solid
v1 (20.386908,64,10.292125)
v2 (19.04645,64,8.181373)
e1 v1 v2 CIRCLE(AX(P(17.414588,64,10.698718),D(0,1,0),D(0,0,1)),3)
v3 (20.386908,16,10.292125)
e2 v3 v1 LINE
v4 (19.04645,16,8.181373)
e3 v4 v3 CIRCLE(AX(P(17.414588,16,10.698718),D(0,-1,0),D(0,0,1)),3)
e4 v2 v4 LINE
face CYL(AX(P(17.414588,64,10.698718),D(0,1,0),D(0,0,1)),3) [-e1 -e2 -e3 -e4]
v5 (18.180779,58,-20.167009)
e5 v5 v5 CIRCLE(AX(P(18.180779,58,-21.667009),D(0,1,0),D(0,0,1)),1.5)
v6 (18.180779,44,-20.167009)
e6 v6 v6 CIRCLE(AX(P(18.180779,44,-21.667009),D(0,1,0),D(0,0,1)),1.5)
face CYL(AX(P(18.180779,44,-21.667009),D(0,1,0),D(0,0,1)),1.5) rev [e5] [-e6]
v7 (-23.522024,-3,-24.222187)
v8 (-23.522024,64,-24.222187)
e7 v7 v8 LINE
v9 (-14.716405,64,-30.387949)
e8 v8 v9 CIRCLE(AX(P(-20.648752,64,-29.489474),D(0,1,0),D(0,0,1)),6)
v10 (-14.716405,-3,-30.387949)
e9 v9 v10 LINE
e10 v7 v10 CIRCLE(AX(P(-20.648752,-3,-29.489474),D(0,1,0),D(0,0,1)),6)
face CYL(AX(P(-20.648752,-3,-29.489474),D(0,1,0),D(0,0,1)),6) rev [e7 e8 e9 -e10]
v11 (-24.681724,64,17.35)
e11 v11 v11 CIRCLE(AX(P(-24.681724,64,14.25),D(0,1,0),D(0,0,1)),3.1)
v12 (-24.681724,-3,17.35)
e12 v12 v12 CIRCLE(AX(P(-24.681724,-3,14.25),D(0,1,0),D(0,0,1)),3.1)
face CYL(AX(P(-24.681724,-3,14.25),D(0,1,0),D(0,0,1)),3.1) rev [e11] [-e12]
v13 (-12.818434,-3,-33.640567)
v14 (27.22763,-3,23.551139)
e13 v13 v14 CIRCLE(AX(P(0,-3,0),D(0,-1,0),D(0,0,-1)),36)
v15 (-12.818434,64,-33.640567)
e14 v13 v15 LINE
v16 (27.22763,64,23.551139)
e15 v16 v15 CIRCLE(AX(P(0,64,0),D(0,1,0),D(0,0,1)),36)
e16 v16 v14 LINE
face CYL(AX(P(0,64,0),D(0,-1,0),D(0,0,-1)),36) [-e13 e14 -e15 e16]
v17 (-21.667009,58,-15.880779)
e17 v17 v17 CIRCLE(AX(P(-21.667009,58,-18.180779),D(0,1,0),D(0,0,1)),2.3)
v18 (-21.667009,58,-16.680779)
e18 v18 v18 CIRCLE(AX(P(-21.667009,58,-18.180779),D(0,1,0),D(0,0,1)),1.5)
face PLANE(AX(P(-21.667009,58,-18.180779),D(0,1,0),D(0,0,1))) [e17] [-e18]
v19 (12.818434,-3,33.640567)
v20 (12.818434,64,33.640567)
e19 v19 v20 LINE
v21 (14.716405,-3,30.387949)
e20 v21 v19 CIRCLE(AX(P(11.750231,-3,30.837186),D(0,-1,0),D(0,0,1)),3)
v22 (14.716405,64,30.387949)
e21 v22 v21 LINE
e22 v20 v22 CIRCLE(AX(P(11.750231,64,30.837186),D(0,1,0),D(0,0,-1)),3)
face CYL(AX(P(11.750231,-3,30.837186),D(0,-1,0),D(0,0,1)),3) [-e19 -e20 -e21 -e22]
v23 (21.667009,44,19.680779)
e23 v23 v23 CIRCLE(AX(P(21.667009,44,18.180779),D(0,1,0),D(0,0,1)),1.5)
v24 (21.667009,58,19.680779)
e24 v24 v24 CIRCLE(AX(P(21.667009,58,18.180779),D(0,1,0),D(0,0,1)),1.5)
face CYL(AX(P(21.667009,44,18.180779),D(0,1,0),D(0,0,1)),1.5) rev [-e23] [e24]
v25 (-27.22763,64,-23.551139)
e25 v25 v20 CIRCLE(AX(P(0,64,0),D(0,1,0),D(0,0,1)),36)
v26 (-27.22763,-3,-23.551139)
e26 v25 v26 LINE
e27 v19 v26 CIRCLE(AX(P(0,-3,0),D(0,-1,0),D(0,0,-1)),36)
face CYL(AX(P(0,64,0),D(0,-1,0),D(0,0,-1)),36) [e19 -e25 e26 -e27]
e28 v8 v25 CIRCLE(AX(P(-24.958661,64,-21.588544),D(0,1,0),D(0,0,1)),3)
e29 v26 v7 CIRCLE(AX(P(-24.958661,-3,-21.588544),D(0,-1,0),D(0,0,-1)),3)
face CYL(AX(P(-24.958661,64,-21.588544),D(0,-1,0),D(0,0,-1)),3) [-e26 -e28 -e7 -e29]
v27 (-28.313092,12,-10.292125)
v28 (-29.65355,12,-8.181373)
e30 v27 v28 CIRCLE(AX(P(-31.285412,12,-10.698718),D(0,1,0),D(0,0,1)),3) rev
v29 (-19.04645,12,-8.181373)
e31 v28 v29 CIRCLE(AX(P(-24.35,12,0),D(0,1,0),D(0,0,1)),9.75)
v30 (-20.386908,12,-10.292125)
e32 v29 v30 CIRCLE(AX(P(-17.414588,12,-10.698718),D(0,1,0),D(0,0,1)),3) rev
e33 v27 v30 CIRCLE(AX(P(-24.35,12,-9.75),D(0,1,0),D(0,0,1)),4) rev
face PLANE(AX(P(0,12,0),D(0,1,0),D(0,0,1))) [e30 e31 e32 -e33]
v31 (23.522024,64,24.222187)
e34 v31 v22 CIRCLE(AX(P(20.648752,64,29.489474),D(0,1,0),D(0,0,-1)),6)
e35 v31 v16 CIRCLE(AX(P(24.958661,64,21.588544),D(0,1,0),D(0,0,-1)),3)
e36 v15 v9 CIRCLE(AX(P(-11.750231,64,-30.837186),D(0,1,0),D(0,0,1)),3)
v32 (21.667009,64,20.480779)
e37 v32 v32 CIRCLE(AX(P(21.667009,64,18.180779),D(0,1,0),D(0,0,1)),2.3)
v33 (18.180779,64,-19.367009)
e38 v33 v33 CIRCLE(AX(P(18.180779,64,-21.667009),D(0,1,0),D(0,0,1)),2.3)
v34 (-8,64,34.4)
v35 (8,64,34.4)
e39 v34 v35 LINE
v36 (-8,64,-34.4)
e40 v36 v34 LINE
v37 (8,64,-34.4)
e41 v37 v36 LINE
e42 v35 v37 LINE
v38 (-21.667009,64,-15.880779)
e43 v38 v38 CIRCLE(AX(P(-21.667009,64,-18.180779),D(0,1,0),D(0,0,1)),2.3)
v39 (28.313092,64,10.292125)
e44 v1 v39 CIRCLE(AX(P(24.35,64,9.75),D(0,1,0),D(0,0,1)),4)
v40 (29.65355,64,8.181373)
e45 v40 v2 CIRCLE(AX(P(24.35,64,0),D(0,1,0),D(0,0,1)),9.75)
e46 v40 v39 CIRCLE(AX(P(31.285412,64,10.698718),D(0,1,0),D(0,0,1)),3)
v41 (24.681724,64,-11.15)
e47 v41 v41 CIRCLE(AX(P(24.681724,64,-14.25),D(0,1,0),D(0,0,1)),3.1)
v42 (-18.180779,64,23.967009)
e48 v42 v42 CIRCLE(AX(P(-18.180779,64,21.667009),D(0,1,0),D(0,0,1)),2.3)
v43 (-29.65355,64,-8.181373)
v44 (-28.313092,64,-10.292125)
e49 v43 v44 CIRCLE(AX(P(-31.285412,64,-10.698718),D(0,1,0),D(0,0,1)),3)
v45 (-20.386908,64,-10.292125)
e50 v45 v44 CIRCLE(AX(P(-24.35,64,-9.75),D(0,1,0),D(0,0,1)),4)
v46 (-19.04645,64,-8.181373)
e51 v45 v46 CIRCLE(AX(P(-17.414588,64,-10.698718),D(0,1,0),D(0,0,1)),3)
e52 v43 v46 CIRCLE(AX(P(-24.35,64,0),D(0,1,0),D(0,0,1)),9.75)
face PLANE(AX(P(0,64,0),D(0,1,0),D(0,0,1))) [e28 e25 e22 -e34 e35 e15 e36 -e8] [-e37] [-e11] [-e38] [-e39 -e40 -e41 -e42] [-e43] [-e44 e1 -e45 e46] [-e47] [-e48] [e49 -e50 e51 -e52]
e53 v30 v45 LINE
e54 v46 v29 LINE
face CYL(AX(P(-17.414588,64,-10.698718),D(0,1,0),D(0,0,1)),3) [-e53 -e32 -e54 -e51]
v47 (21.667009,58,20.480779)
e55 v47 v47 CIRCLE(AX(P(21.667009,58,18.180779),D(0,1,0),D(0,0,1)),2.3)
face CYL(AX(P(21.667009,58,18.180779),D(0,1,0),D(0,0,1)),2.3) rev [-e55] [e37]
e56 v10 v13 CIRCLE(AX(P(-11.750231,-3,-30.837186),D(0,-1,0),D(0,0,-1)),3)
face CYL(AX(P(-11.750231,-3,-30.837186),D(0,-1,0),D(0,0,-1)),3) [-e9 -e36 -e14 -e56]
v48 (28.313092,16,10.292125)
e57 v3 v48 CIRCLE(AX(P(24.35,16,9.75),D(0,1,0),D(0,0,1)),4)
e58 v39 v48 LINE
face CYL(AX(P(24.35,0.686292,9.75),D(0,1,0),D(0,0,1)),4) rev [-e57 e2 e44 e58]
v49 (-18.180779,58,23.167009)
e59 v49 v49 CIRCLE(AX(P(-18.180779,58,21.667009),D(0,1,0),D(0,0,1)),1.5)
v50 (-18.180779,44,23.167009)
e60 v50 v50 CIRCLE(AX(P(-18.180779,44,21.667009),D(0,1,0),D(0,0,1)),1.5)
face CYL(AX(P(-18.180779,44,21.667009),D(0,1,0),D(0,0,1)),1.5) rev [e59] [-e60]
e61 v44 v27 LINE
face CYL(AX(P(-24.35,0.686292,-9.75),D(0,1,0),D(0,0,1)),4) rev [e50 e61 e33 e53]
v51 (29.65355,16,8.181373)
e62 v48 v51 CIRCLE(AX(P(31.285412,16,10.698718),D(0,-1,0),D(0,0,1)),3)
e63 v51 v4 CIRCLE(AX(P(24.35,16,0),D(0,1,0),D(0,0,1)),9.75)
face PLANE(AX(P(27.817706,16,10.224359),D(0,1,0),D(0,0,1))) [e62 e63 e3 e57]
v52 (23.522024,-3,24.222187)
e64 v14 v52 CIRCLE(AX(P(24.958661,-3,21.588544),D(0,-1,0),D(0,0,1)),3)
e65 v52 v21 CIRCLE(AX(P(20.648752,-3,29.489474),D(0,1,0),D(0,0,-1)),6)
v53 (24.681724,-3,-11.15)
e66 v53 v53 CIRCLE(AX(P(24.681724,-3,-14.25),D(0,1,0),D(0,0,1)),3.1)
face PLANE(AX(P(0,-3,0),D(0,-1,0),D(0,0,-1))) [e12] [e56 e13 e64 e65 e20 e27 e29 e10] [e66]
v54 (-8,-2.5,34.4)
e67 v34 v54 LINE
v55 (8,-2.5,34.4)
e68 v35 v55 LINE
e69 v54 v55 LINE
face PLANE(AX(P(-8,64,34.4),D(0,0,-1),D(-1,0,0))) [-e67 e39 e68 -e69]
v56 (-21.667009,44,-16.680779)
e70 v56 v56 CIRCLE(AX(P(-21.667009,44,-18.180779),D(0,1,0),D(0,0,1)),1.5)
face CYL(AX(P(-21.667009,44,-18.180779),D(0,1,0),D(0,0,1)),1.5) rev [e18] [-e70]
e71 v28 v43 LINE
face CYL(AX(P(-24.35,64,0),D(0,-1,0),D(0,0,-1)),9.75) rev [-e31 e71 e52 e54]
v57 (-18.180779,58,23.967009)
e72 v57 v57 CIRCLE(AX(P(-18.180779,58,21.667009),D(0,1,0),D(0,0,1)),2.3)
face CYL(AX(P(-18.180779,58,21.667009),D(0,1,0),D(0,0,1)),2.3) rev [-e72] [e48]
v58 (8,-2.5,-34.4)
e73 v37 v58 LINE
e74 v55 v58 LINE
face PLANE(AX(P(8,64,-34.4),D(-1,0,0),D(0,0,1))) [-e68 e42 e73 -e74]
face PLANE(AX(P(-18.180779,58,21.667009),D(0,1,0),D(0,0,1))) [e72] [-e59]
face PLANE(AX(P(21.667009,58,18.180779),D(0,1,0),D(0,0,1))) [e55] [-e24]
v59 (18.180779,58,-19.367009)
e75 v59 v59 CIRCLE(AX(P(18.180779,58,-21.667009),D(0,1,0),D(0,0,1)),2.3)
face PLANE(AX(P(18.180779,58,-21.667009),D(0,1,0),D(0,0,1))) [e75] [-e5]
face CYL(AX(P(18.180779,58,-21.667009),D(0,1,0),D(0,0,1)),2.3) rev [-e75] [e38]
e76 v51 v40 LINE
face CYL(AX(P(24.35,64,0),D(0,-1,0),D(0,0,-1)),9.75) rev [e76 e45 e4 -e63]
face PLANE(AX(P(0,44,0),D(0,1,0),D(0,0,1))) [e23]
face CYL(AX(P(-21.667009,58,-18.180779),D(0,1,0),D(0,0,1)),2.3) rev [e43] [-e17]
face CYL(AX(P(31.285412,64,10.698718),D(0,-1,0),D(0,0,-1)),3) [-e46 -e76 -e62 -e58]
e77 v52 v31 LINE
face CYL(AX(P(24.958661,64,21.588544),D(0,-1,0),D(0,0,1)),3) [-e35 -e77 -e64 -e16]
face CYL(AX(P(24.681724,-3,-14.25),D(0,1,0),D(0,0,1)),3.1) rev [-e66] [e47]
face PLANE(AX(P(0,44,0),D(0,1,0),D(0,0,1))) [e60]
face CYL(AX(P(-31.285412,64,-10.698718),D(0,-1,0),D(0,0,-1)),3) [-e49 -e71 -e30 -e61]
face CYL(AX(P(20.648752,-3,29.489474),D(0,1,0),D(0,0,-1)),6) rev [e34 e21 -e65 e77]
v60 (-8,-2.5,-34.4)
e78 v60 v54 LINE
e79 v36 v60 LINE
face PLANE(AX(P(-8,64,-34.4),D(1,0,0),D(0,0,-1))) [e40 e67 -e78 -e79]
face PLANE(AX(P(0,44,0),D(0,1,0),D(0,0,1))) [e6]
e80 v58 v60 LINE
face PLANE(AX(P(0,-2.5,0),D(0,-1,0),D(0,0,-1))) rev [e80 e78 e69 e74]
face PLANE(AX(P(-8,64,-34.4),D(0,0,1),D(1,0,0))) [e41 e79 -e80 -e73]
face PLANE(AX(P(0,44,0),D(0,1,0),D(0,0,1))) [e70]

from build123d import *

# Parameters (mm, degrees)
BOSS_EXTRUDE1_OUTLINE_R   = 36
BOSS_EXTRUDE1_OUTLINE_R_2 = 9.75
BOSS_EXTRUDE1_OUTLINE_W   = 16
BOSS_EXTRUDE1_OUTLINE_H   = 68.8
BOSS_EXTRUDE1_DEPTH       = 64
BOSS_EXTRUDE2_START       = 3
SKETCH2_R                 = 36
BOSS_EXTRUDE2_DEPTH       = 3
SKETCH1_2_R               = 9.75
BOSS_EXTRUDE3_DEPTH       = 12
SKETCH4_R                 = 4
CUT_EXTRUDE1_DEPTH        = 52
SKETCH5_R                 = 1.5
CUT_EXTRUDE2_DEPTH        = 20
SKETCH5_3_R               = 2.3
SKETCH5_3_R_2             = 1.5
CUT_EXTRUDE3_DEPTH        = 6
CUT_EXTRUDE4_DEPTH        = 85.148677946
CUT_EXTRUDE4_DEPTH_BACK   = 85.148677946
SKETCH6_R                 = 3.1
CUT_EXTRUDE5_DEPTH        = 85.148677946
FILLET1_R                 = 3
CIRPATTERN1_COUNT         = 2
FILLET1_OF_CIRPATTERN1_R  = 3
BOSS_EXTRUDE4_DEPTH       = 4
SKETCH9_W                 = 16
SKETCH9_H                 = 68.8
CUT_EXTRUDE6_DEPTH        = 2.5


# Read off the part's stored shape, not the designer's step: Boss-Extrude1
with BuildPart() as part:
    # Boss-Extrude1 outline → Boss-Extrude1 (new body)
    with BuildSketch(Plane(origin=(0, 0, 0), x_dir=(1, 0, 0), z_dir=(0, 1, 0))):
        Circle(BOSS_EXTRUDE1_OUTLINE_R)
        with Locations((-24.35, 0)):
            Circle(BOSS_EXTRUDE1_OUTLINE_R_2, mode=Mode.SUBTRACT)
        Rectangle(BOSS_EXTRUDE1_OUTLINE_W, BOSS_EXTRUDE1_OUTLINE_H, mode=Mode.SUBTRACT)
        with Locations((24.35, 0)):
            Circle(BOSS_EXTRUDE1_OUTLINE_R_2, mode=Mode.SUBTRACT)
    extrude(amount=BOSS_EXTRUDE1_DEPTH)

    # Sketch2 → Boss-Extrude2 (add)
    with BuildSketch(Plane.XZ.offset(BOSS_EXTRUDE2_START)):
        with Locations(Location((0, 0, 0), (0, 0, 270))):
            Circle(SKETCH2_R)
    extrude(amount=-BOSS_EXTRUDE2_DEPTH)

    # Sketch1<2> → Boss-Extrude3 (add)
    with BuildSketch(Plane(origin=(0, 0, 0), x_dir=(1, 0, 0), z_dir=(0, 1, 0))):
        with Locations(Location((-24.35, 0, 0), (0, 0, 270))):
            Circle(SKETCH1_2_R)
        with Locations(Location((24.35, 0, 0), (0, 0, 270))):
            Circle(SKETCH1_2_R)
    extrude(amount=BOSS_EXTRUDE3_DEPTH)

    # Sketch4 → Cut-Extrude1 (cut)
    with BuildSketch(Plane(origin=(0, 64, 0), x_dir=(1, 0, 0), z_dir=(0, 1, 0))):
        with Locations((-24.35, 9.75)):
            Circle(SKETCH4_R)
        with Locations((24.35, -9.75)):
            Circle(SKETCH4_R)
    extrude(amount=-CUT_EXTRUDE1_DEPTH, mode=Mode.SUBTRACT)

    # Sketch5 → Cut-Extrude2 (cut)
    with BuildSketch(Plane(origin=(0, 64, 0), x_dir=(1, 0, 0), z_dir=(0, 1, 0))):
        with Locations(Location((-21.667008817, 18.180779107, 0), (0, 0, 270))):
            Circle(SKETCH5_R)
        with Locations(Location((18.180779107, 21.667008817, 0), (0, 0, 270))):
            Circle(SKETCH5_R)
        with Locations(Location((-18.180779107, -21.667008817, 0), (0, 0, 270))):
            Circle(SKETCH5_R)
        with Locations(Location((21.667008817, -18.180779107, 0), (0, 0, 270))):
            Circle(SKETCH5_R)
    extrude(amount=-CUT_EXTRUDE2_DEPTH, mode=Mode.SUBTRACT)

    # Sketch5<3> → Cut-Extrude3 (cut)
    # profile 1 of 4: a face of its own
    with BuildSketch(Plane(origin=(0, 64, 0), x_dir=(1, 0, 0), z_dir=(0, 1, 0))):
        with Locations(Location((-21.667008817, 18.180779107, 0), (0, 0, 270))):
            Circle(SKETCH5_3_R)
        with Locations(Location((-21.667008817, 18.180779107, 0), (0, 0, 270))):
            Circle(SKETCH5_3_R_2, mode=Mode.SUBTRACT)
    # profile 2 of 4: a face of its own
    with BuildSketch(Plane(origin=(0, 64, 0), x_dir=(1, 0, 0), z_dir=(0, 1, 0))):
        with Locations(Location((18.180779107, 21.667008817, 0), (0, 0, 270))):
            Circle(SKETCH5_3_R)
        with Locations(Location((18.180779107, 21.667008817, 0), (0, 0, 270))):
            Circle(SKETCH5_3_R_2, mode=Mode.SUBTRACT)
    # profile 3 of 4: a face of its own
    with BuildSketch(Plane(origin=(0, 64, 0), x_dir=(1, 0, 0), z_dir=(0, 1, 0))):
        with Locations(Location((21.667008817, -18.180779107, 0), (0, 0, 270))):
            Circle(SKETCH5_3_R)
        with Locations(Location((21.667008817, -18.180779107, 0), (0, 0, 270))):
            Circle(SKETCH5_3_R_2, mode=Mode.SUBTRACT)
    # profile 4 of 4: a face of its own
    with BuildSketch(Plane(origin=(0, 64, 0), x_dir=(1, 0, 0), z_dir=(0, 1, 0))):
        with Locations(Location((-18.180779107, -21.667008817, 0), (0, 0, 270))):
            Circle(SKETCH5_3_R)
        with Locations(Location((-18.180779107, -21.667008817, 0), (0, 0, 270))):
            Circle(SKETCH5_3_R_2, mode=Mode.SUBTRACT)
    extrude(amount=-CUT_EXTRUDE3_DEPTH, mode=Mode.SUBTRACT)

    # Sketch6 → Cut-Extrude4 (cut, two sides: drawn at the far end of the back side and taken through both)
    with BuildSketch(Plane(origin=(0, 64, 0), x_dir=(1, 0, 0), z_dir=(0, 1, 0)).offset(-CUT_EXTRUDE4_DEPTH_BACK)):
        with Locations(Location((-24.681724008, -14.25, 0), (0, 0, 270))):
            Circle(SKETCH6_R)
        with Locations(Location((24.681724008, 14.25, 0), (0, 0, 270))):
            Circle(SKETCH6_R)
    extrude(amount=CUT_EXTRUDE4_DEPTH + CUT_EXTRUDE4_DEPTH_BACK, mode=Mode.SUBTRACT)

    # Sketch7 → Cut-Extrude5 (cut, symmetric)
    with BuildSketch(Plane(origin=(0, 64, 0), x_dir=(1, 0, 0), z_dir=(0, 1, 0))):
        with BuildLine():
            ThreePointArc((-25.259780357, 25.650409281), (-17.207293091, 24.574561329), (-15.464146624, 32.509385863))
            ThreePointArc((-15.464146624, 32.509385863), (-20.648751709, 29.489473594), (-25.259780357, 25.650409281))
        make_face()
    cut_extrude5 = extrude(amount=CUT_EXTRUDE5_DEPTH, both=True, mode=Mode.SUBTRACT)

    # Fillet1
    fillet1_edges = [part.edges().sort_by_distance(p)[0] for p in [
        (-25.259780357, 30.5, -25.650409281),
        (-15.464146624, 30.5, -32.509385863),
        (-20.435059552, 38, -8.929487179),
        (-28.264940448, 38, -8.929487179),
        (20.435059552, 38, 8.929487179),
        (28.264940448, 38, 8.929487179),
    ]]
    fillet(fillet1_edges, radius=FILLET1_R)

    # CirPattern1: Cut-Extrude5 ×2 about axis
    cirpattern1_axis = Axis((0, 0, 0), (0, 1, 0))
    for i in range(1, CIRPATTERN1_COUNT):
        add(cut_extrude5.rotate(cirpattern1_axis, i * 360 / CIRPATTERN1_COUNT), mode=Mode.SUBTRACT)

    # Fillet1 of CirPattern1
    fillet1_of_cirpattern1_edges = [part.edges().sort_by_distance(p)[0] for p in [
        (25.259780357, 30.5, 25.650409281),
        (15.464146624, 30.5, 32.509385863),
        (20.435059552, 38, 8.929487179),
        (28.264940448, 38, 8.929487179),
        (-20.435059552, 38, -8.929487179),
        (-28.264940448, 38, -8.929487179),
    ]]
    fillet(fillet1_of_cirpattern1_edges, radius=FILLET1_OF_CIRPATTERN1_R)

    # Sketch8 → Boss-Extrude4 (add)
    with BuildSketch(Plane(origin=(0, 12, 0), x_dir=(1, 0, 0), z_dir=(0, 1, 0))):
        with BuildLine():
            ThreePointArc((20.386907649, -10.292124542), (24.35, -13.75), (28.313092351, -10.292124542))
            ThreePointArc((28.313092351, -10.292124542), (28.752934813, -9.090438977), (29.653550058, -8.181372549))
            ThreePointArc((29.653550058, -8.181372549), (24.35, 9.75), (19.046449942, -8.181372549))
            ThreePointArc((19.046449942, -8.181372549), (19.947065187, -9.090438977), (20.386907649, -10.292124542))
        make_face()
    extrude(amount=BOSS_EXTRUDE4_DEPTH)

    # Sketch9 → Cut-Extrude6 (cut)
    with BuildSketch(Plane(origin=(0, 0, 0), x_dir=(1, 0, 0), z_dir=(0, 1, 0))):
        Rectangle(SKETCH9_W, SKETCH9_H)
    extrude(amount=-CUT_EXTRUDE6_DEPTH, mode=Mode.SUBTRACT)


solid = part.part
